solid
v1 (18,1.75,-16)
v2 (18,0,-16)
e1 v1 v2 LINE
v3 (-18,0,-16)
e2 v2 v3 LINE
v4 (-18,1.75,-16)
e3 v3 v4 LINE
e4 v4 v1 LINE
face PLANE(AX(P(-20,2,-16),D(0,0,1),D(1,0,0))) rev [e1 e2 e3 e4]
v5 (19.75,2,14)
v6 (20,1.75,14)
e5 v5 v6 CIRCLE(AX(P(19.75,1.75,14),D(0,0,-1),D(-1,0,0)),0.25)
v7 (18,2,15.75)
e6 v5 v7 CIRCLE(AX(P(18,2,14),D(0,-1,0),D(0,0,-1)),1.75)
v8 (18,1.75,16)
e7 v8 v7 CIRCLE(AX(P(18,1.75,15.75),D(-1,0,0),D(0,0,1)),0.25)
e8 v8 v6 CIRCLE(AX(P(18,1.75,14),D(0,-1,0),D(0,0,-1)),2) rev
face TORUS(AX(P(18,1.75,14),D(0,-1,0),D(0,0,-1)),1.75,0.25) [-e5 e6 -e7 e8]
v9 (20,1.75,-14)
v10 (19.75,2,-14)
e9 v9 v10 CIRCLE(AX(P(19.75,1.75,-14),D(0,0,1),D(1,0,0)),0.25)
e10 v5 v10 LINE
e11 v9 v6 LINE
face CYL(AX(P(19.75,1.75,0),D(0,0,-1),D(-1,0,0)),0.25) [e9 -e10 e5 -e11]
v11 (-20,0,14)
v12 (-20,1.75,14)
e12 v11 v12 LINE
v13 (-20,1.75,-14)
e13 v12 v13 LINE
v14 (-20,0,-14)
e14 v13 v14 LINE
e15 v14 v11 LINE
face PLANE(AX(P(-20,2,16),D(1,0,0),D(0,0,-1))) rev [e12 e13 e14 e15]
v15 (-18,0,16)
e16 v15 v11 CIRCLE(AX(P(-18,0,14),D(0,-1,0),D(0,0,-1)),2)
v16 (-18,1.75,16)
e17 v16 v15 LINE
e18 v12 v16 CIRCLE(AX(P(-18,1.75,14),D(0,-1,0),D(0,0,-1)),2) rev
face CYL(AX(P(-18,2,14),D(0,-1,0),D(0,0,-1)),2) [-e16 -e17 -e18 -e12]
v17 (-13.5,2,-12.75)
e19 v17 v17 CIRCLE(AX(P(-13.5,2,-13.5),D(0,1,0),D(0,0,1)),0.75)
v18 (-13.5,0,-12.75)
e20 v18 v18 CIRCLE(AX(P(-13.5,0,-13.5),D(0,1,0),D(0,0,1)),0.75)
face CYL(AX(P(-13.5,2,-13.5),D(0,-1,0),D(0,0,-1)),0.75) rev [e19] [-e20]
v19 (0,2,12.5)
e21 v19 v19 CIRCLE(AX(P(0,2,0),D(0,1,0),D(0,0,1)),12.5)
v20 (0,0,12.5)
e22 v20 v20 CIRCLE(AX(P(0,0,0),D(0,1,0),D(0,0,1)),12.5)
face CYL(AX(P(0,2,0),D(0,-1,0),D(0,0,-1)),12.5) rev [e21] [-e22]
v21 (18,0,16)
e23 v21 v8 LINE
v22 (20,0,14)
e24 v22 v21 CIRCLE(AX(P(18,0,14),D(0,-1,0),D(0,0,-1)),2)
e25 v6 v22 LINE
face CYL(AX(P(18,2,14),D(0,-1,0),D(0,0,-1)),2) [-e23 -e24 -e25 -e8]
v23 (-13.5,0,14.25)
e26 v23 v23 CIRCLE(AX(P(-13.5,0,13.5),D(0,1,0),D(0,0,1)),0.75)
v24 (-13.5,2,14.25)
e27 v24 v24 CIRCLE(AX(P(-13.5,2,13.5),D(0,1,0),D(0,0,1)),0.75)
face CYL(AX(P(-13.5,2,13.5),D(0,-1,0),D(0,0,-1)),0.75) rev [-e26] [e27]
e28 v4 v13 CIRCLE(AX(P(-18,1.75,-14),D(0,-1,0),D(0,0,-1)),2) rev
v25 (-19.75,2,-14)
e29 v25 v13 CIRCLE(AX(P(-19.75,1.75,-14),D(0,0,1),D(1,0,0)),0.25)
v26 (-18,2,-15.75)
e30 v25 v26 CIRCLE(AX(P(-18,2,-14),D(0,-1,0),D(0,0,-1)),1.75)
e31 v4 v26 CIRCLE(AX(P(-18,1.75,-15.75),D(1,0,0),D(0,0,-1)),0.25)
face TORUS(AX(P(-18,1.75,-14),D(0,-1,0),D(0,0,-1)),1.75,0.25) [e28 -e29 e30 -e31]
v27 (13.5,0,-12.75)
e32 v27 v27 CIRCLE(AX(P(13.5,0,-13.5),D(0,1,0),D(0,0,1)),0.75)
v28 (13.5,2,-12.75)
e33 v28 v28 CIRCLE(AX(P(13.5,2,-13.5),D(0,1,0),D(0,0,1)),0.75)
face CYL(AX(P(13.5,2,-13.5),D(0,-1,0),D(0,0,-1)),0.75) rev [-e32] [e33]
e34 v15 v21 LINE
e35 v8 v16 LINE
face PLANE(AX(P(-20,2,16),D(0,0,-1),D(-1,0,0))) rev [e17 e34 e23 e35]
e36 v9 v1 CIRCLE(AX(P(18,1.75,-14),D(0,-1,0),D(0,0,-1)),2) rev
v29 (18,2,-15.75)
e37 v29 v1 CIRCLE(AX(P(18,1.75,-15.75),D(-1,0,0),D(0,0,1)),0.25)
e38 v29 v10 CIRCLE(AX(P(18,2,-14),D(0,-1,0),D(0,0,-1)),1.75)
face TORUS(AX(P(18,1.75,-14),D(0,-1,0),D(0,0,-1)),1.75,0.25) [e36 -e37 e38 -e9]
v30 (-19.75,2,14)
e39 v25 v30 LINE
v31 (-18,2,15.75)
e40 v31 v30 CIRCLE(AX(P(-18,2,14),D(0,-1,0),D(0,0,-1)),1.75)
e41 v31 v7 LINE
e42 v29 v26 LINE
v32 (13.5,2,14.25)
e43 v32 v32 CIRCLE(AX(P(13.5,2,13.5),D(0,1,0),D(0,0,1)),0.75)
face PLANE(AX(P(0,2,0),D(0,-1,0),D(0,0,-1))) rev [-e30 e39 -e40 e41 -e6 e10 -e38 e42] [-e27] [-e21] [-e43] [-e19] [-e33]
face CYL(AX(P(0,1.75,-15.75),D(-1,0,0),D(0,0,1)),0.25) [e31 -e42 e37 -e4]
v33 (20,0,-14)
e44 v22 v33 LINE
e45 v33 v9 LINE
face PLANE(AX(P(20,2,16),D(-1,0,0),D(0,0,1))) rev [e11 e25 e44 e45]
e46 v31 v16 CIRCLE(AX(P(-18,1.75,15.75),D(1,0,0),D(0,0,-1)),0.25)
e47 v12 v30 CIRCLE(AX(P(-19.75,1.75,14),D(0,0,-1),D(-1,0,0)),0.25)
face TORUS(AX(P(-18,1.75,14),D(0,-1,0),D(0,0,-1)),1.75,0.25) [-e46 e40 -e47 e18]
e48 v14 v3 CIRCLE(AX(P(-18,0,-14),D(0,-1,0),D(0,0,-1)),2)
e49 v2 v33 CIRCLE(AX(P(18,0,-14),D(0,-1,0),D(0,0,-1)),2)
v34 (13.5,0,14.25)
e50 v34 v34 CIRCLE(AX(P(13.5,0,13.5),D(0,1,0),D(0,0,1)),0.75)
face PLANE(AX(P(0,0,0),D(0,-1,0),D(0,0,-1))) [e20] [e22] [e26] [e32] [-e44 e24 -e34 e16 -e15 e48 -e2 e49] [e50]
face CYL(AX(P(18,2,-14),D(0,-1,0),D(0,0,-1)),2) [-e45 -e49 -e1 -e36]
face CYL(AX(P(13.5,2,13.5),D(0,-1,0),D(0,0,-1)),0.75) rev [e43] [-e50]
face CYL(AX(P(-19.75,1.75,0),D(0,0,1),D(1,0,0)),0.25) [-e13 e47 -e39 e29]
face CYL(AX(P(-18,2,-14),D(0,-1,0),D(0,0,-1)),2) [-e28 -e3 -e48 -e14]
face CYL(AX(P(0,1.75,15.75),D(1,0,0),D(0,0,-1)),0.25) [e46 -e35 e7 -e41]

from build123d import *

# Parameters (mm, degrees)
SKETCH1_W           = 40
SKETCH1_H           = 32
SKETCH1_R           = 12.5
SKETCH1_R_2         = 0.75
BOSS_EXTRUDE1_DEPTH = 2
FILLET1_R           = 0.25
FILLET2_R           = 2


with BuildPart() as part:
    # Sketch1 → Boss-Extrude1 (new body)
    with BuildSketch(Plane(origin=(0, 0, 0), x_dir=(1, 0, 0), z_dir=(0, 1, 0))):
        Rectangle(SKETCH1_W, SKETCH1_H)
        with Locations(Location((0, 0, 0), (0, 0, 270))):
            Circle(SKETCH1_R, mode=Mode.SUBTRACT)
        with Locations(Location((-13.5, 13.5, 0), (0, 0, 270))):
            Circle(SKETCH1_R_2, mode=Mode.SUBTRACT)
        with Locations(Location((13.5, 13.5, 0), (0, 0, 270))):
            Circle(SKETCH1_R_2, mode=Mode.SUBTRACT)
        with Locations(Location((13.5, -13.5, 0), (0, 0, 270))):
            Circle(SKETCH1_R_2, mode=Mode.SUBTRACT)
        with Locations(Location((-13.5, -13.5, 0), (0, 0, 270))):
            Circle(SKETCH1_R_2, mode=Mode.SUBTRACT)
    extrude(amount=BOSS_EXTRUDE1_DEPTH)

    # Fillet1
    fillet1_edges = [part.edges().sort_by_distance(p)[0] for p in [
        (-20, 2, 0),
        (0, 2, 16),
        (20, 2, 0),
        (0, 2, -16),
    ]]
    fillet(fillet1_edges, radius=FILLET1_R)

    # Fillet2
    # the kernel refuses this fillet: 2 mm, written as the material it takes off along each edge
    with BuildSketch(Plane(origin=(-18, 2, 14), x_dir=(-1, 0, 0), z_dir=(0, 0, -1))) as fillet2_piece_1:
        with BuildLine():
            CenterArc((1.75, -0.25), 0.25, 0, 90)
            Line((2, -0.25), (2, 0))
            Line((2, 0), (1.75, 0))
        make_face()
    revolve(axis=Axis((-18, 2, 14), (0, 1, 0)), revolution_arc=90, mode=Mode.SUBTRACT)
    with BuildSketch(Plane(origin=(-18, 2, -14), x_dir=(0, 0, -1), z_dir=(1, 0, 0))) as fillet2_piece_2:
        with BuildLine():
            CenterArc((1.75, -0.25), 0.25, 0, 90)
            Line((2, -0.25), (2, 0))
            Line((2, 0), (1.75, 0))
        make_face()
    revolve(axis=Axis((-18, 2, -14), (0, 1, 0)), revolution_arc=90, mode=Mode.SUBTRACT)
    with BuildSketch(Plane(origin=(18, 2, 14), x_dir=(0, 0, 1), z_dir=(-1, 0, 0))) as fillet2_piece_3:
        with BuildLine():
            CenterArc((1.75, -0.25), 0.25, 0, 90)
            Line((2, -0.25), (2, 0))
            Line((2, 0), (1.75, 0))
        make_face()
    revolve(axis=Axis((18, 2, 14), (0, 1, 0)), revolution_arc=90, mode=Mode.SUBTRACT)
    with BuildSketch(Plane(origin=(18, 2, -14), x_dir=(1, 0, 0), z_dir=(0, 0, 1))) as fillet2_piece_4:
        with BuildLine():
            CenterArc((1.75, -0.25), 0.25, 0, 90)
            Line((2, -0.25), (2, 0))
            Line((2, 0), (1.75, 0))
        make_face()
    revolve(axis=Axis((18, 2, -14), (0, 1, 0)), revolution_arc=90, mode=Mode.SUBTRACT)
    with BuildSketch(Plane(origin=(20, -5, -16), x_dir=(0, 0, 1), z_dir=(0, 1, 0)), Plane(origin=(20, -5, 16), x_dir=(-1, 0, 0), z_dir=(0, 1, 0))) as fillet2_piece_5:
        with BuildLine():
            CenterArc((FILLET2_R, -FILLET2_R), FILLET2_R, 90, 90)
            Line((0, -FILLET2_R), (0, 0))
            Line((0, 0), (FILLET2_R, 0))
        make_face()
    extrude(amount=7, mode=Mode.SUBTRACT)
    with BuildSketch(Plane(origin=(-20, -5, -16), x_dir=(0, 0, 1), z_dir=(0, 1, 0)), Plane(origin=(-20, -5, 16), x_dir=(1, 0, 0), z_dir=(0, 1, 0))) as fillet2_piece_6:
        with BuildLine():
            CenterArc((FILLET2_R, FILLET2_R), FILLET2_R, 180, 90)
            Line((0, FILLET2_R), (0, 0))
            Line((0, 0), (FILLET2_R, 0))
        make_face()
    extrude(amount=7, mode=Mode.SUBTRACT)


solid = part.part
